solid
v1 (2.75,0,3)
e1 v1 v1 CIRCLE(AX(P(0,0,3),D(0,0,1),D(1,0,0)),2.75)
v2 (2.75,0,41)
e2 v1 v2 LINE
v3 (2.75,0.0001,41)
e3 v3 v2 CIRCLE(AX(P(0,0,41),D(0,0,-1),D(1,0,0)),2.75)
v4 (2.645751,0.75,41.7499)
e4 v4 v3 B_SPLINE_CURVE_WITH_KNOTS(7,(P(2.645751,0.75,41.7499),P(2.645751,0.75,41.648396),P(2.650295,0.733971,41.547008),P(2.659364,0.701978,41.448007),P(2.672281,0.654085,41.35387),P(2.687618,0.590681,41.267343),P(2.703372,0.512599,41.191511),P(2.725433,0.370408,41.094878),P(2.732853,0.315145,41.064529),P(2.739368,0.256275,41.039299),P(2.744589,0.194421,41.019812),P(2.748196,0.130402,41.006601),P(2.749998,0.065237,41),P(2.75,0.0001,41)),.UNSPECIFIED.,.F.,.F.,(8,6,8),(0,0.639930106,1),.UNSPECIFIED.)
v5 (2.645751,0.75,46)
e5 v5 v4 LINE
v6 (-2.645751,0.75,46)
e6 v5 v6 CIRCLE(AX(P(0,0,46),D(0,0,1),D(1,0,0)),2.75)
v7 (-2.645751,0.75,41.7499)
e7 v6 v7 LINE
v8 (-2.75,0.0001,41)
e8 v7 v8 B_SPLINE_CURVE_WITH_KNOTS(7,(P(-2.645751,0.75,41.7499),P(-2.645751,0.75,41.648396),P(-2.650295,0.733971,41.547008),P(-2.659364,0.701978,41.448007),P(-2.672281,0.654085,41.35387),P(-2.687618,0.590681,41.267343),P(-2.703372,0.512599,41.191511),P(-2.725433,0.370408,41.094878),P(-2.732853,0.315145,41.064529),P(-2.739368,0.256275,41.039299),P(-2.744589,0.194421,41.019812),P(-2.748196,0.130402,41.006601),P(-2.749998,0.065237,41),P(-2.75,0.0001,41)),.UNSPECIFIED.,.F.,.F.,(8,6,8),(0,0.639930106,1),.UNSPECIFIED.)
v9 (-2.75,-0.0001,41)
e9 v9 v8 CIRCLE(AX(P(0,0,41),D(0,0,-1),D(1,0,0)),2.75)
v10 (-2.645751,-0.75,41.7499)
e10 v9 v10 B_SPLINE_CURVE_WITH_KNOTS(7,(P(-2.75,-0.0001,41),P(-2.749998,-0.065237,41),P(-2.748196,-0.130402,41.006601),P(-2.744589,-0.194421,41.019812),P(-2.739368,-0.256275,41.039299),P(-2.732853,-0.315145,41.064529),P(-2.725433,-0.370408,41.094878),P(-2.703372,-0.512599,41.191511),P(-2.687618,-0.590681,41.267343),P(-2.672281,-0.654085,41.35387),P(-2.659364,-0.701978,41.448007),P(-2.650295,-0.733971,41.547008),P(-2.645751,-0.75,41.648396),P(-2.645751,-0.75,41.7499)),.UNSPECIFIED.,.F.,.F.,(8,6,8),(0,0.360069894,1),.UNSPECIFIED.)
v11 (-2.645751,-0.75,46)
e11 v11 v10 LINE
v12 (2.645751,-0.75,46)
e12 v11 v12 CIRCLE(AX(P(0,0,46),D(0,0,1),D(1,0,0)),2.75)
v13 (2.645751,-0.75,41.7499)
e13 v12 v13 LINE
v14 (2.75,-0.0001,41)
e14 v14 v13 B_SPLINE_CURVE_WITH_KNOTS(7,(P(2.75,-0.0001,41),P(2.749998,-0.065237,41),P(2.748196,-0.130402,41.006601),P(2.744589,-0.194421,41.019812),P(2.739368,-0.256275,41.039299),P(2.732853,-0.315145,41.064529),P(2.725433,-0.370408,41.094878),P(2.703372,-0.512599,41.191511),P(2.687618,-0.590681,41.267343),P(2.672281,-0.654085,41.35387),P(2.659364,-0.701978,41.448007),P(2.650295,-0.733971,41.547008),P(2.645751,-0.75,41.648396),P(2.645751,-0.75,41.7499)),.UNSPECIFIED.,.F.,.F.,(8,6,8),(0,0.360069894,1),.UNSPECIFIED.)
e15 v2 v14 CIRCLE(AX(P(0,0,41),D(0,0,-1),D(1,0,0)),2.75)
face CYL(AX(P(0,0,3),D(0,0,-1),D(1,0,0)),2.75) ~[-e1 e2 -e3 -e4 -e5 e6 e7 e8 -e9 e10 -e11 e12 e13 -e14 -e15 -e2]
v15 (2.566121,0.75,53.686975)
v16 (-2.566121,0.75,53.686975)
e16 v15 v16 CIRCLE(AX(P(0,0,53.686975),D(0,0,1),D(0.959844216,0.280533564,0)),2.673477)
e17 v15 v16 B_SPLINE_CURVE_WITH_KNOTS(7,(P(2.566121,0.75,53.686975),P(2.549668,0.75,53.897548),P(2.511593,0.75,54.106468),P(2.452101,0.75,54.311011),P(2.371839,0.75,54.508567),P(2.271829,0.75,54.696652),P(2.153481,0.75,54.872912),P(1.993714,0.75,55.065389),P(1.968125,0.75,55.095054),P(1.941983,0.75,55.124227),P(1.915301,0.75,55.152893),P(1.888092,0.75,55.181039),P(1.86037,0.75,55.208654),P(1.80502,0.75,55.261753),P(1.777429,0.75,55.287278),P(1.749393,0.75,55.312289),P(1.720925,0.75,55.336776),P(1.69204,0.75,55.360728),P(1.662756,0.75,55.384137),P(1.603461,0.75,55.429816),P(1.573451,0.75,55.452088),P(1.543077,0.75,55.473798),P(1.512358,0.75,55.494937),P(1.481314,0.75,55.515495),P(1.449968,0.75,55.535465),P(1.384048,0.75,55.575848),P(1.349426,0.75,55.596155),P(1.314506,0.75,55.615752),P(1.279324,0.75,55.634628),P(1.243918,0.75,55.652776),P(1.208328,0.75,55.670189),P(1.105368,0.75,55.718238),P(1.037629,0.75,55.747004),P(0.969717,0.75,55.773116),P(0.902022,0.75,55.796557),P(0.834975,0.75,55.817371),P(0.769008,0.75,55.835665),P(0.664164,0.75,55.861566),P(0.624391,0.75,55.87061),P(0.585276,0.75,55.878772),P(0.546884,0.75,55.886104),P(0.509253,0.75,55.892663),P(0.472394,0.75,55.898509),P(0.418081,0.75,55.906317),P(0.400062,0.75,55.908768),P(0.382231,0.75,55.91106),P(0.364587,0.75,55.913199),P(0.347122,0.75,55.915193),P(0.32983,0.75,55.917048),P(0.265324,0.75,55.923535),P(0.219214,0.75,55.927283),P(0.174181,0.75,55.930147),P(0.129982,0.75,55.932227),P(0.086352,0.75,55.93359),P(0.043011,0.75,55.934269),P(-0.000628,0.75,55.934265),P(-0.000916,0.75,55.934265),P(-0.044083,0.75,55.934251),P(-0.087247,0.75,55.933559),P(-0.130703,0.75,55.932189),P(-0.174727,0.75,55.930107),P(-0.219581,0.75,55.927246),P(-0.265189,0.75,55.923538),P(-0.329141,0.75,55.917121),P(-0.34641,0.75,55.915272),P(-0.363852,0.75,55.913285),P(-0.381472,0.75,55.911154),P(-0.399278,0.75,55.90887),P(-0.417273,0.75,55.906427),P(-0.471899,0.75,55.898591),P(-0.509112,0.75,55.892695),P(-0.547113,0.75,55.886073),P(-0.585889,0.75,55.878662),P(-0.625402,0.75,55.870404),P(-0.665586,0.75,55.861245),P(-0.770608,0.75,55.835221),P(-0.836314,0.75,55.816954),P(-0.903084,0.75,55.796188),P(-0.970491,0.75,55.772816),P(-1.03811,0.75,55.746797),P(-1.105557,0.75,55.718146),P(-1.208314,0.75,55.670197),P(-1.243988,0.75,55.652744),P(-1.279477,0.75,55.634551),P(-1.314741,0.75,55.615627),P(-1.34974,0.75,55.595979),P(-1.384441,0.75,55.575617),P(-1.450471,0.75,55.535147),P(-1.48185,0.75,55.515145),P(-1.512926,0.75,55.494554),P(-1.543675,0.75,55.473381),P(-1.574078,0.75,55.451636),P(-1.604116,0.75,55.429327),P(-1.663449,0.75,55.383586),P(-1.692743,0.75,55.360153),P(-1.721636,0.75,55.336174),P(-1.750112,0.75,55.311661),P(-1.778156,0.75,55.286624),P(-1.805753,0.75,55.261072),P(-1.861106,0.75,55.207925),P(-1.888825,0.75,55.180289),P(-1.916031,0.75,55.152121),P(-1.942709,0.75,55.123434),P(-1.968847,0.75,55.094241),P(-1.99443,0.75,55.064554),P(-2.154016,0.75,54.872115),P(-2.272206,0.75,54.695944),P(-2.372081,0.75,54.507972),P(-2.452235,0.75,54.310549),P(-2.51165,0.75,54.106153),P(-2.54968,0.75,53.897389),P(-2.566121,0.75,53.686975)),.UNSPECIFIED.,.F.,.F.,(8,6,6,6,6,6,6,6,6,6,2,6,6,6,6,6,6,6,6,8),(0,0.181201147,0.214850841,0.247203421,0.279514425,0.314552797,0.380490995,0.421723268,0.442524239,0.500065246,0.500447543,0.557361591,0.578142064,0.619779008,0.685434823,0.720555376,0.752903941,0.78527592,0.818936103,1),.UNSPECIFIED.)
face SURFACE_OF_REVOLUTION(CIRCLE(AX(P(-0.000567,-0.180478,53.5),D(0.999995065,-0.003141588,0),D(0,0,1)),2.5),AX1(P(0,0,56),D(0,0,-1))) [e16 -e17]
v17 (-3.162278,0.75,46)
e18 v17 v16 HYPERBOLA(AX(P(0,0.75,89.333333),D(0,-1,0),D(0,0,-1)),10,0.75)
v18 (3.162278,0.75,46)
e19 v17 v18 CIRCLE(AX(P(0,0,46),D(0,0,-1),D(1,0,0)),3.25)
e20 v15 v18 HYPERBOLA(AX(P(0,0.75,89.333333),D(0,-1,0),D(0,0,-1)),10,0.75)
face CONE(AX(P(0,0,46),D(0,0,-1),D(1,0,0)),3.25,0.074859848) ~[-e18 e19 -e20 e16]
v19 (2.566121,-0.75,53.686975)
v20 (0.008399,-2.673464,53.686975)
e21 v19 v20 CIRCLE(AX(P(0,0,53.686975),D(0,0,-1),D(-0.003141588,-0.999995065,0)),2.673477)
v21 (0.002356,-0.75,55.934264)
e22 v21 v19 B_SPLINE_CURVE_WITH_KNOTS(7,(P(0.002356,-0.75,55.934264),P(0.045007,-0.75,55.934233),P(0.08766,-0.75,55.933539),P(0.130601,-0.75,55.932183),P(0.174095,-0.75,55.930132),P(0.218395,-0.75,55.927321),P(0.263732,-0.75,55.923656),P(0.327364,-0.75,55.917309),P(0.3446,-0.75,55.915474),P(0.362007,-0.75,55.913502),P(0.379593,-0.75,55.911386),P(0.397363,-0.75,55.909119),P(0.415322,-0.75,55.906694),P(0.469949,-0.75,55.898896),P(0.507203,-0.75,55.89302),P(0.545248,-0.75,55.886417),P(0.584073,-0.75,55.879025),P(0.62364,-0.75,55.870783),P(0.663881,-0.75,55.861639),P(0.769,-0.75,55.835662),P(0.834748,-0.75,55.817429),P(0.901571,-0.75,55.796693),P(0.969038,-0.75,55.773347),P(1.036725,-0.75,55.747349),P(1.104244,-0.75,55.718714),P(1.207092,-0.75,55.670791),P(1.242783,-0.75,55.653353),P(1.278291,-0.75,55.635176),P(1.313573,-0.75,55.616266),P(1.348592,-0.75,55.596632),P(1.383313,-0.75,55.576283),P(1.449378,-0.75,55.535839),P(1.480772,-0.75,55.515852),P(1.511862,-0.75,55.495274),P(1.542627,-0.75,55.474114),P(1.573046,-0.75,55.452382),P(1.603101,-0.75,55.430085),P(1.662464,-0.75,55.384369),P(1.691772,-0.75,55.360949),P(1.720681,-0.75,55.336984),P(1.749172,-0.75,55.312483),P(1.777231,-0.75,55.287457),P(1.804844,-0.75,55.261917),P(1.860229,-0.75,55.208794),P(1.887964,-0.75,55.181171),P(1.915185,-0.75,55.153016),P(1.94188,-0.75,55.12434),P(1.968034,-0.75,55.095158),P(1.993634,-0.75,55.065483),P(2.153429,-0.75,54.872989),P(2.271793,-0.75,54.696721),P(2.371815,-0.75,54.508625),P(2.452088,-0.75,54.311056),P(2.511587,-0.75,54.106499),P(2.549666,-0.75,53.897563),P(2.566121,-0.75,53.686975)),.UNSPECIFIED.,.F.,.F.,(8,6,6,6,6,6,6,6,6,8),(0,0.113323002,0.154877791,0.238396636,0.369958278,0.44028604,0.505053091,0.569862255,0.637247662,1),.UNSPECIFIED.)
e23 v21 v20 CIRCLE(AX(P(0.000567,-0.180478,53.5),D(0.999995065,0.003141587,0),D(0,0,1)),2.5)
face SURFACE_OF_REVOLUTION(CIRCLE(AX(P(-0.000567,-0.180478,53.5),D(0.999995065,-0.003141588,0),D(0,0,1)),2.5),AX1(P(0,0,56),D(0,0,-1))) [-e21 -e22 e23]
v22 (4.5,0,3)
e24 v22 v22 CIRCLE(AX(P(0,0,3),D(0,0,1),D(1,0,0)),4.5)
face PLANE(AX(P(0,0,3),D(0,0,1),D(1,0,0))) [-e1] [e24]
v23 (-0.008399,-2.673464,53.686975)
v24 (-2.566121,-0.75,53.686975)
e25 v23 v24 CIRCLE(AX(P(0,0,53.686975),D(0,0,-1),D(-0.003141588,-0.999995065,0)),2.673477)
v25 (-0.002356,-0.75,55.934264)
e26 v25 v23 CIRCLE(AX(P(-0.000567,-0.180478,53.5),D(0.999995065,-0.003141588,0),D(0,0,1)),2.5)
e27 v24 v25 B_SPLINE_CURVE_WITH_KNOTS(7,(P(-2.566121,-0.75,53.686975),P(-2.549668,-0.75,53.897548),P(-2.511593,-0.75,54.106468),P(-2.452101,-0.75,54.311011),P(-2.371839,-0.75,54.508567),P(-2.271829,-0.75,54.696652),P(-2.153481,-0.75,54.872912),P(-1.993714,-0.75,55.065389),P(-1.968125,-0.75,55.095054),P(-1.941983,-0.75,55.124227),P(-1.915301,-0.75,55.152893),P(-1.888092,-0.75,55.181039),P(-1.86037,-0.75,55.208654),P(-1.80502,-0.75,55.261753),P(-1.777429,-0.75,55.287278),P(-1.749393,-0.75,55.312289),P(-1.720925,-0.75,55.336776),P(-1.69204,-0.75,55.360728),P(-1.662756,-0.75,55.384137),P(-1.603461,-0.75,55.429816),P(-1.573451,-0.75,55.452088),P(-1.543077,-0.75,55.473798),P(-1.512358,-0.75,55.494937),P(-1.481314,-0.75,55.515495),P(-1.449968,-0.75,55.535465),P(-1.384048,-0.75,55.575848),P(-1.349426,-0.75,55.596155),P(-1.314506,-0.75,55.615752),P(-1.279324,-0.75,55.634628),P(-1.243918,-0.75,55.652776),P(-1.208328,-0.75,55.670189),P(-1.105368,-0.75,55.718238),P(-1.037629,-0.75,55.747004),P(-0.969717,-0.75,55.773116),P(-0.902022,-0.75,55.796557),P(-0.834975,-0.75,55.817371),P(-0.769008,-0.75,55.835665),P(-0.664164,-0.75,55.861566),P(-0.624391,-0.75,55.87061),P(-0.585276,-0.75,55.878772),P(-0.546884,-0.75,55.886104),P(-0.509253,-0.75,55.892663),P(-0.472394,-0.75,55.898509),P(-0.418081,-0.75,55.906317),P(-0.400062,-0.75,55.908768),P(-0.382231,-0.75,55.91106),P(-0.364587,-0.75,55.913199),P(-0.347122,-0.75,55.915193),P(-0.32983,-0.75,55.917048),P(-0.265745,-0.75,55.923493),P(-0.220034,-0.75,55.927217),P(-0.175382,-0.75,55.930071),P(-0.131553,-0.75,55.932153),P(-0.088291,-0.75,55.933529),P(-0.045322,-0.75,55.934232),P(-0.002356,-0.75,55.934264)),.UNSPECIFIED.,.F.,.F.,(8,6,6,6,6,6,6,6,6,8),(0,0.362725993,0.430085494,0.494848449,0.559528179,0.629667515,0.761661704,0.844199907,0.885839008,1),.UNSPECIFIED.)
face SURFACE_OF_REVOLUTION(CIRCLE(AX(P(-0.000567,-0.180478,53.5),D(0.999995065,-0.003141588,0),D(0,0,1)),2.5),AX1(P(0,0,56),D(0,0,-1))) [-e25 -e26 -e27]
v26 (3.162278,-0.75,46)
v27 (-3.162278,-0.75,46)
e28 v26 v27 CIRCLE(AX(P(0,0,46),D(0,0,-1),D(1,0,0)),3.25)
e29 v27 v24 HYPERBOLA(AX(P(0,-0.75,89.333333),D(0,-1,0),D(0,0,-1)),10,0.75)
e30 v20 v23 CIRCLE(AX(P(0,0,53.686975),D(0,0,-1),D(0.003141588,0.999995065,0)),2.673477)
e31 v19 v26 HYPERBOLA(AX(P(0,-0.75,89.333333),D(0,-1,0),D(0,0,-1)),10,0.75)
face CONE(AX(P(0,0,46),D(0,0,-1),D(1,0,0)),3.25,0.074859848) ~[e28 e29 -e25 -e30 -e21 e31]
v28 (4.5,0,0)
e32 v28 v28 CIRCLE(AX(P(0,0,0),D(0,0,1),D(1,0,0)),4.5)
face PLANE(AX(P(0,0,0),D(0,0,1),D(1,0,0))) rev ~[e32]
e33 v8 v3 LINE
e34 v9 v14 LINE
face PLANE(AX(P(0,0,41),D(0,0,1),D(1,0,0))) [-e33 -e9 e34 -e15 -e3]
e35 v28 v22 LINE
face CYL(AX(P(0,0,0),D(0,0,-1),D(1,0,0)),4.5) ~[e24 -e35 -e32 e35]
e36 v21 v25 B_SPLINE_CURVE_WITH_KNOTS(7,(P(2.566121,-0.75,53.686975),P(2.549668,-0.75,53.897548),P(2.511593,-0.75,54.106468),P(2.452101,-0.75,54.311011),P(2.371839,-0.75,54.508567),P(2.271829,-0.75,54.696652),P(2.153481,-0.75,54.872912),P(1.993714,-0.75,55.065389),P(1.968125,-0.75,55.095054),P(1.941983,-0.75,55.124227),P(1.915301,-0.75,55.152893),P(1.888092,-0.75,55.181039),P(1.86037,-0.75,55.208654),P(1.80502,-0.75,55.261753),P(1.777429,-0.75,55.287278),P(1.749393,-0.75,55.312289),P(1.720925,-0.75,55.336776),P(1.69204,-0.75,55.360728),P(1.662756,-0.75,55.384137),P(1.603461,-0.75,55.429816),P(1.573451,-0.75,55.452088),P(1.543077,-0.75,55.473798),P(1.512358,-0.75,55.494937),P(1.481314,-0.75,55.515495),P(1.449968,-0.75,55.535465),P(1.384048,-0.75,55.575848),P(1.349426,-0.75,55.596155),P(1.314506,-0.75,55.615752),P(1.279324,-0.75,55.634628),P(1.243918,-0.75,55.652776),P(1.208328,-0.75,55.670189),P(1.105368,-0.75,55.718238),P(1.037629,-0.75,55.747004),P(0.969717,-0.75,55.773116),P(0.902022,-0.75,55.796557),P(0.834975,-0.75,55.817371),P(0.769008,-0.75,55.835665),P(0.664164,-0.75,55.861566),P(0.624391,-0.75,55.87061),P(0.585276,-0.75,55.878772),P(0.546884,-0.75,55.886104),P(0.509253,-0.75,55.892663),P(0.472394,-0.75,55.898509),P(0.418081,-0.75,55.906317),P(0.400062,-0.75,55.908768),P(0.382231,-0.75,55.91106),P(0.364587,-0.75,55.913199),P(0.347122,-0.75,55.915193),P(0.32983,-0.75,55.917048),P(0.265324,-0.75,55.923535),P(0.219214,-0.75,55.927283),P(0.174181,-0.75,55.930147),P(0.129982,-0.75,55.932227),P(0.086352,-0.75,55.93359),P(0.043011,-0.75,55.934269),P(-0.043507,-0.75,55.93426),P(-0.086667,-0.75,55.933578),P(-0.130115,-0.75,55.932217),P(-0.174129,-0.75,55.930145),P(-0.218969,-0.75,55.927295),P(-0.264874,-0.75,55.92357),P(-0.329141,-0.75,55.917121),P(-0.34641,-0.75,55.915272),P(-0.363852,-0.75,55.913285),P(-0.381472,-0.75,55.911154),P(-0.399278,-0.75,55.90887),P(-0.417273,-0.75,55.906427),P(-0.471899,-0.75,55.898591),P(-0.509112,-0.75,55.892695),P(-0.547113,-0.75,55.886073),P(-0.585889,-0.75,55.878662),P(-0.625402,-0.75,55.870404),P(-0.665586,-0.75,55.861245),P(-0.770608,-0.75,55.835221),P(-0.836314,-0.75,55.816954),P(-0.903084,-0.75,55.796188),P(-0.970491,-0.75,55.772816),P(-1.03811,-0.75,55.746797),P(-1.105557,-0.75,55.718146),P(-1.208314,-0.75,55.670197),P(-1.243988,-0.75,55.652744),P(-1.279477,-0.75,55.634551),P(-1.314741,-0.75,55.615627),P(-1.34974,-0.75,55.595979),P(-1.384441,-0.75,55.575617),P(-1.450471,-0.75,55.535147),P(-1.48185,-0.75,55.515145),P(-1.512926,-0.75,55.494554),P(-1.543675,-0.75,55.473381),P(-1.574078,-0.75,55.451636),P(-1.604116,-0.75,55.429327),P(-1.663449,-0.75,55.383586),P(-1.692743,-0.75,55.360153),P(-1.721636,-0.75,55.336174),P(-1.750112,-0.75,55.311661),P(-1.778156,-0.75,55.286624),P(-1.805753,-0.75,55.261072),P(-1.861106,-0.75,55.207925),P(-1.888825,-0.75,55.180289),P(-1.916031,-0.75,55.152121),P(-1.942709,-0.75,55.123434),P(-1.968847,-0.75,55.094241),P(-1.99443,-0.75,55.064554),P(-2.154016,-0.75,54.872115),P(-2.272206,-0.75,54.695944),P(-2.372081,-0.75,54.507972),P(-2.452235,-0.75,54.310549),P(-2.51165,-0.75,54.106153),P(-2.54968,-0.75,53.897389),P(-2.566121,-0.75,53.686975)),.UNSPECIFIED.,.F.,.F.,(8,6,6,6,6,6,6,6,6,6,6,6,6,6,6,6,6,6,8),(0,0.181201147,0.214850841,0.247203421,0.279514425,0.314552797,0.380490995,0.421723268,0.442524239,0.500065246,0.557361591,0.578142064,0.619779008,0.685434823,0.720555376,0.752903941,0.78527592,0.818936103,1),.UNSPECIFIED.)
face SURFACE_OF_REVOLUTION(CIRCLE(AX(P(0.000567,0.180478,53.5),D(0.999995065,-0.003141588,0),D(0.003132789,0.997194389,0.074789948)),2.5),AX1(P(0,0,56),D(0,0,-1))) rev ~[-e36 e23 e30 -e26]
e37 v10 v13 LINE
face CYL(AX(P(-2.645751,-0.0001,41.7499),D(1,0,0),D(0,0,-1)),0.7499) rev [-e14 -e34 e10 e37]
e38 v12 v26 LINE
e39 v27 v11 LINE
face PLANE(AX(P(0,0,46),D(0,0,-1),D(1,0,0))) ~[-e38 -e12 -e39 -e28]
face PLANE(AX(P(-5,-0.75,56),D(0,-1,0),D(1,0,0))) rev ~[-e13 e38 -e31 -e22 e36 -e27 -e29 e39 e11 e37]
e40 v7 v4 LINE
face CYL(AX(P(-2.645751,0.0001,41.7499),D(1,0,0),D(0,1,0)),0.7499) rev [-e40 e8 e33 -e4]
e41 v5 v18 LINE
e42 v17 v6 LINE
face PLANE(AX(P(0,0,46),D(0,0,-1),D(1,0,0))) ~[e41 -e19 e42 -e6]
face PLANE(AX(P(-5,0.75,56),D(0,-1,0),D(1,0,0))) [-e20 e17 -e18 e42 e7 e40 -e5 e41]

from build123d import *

# Parameters (mm, degrees)
F0_R        = 4.5
F1_DEPTH    = 3
F2_R        = 2.75
F3_DEPTH    = 43
F6_W        = 10
F6_H        = 1.5
F7_DEPTH    = 15
F8_T2_ANGLE = 359.64
F8_T4_ANGLE = 359.64
F9_R        = 0.7499


# Not quite as in the source:
# - a fillet or chamfer that OpenCascade refuses, or shapes differently, is made with other operations: its cross-section is extruded or revolved along the edge and cut away or added
# - a fillet or chamfer is up to 0.001 mm smaller than in the source, because OpenCascade refuses the exact size


with BuildPart() as f1:
    # F0 (on Top) → F1 (new body)
    with BuildSketch(Plane.XY):
        Circle(F0_R)
    extrude(amount=F1_DEPTH)

    # F2 (on face) → F3 (join)
    with BuildSketch(Plane.XY.offset(3)):
        Circle(F2_R)
    extrude(amount=F3_DEPTH)

    # F4 (on Front) → F5 (revolve)
    with BuildSketch(Plane.XZ):
        Polygon((0, 56), (0, 46), (3.25, 46), (2.5, 56), align=None)
    revolve(axis=Axis((0, 0, 51), (0, 0, -1)))

    # F6 (on face) → F7 (cut)
    with BuildSketch(Plane.XY.offset(56)):
        Rectangle(F6_W, F6_H)
    extrude(amount=-F7_DEPTH, mode=Mode.SUBTRACT)

    # F8: fillet of radius 2.5 on 2 edges, made by hand

    # F8_s1 → F8_t2 (revolve, cut)
    with BuildSketch(Plane(origin=(0, 0, 0), x_dir=(0, 0, 1), z_dir=(0.9999950652, -0.0031415875, 0))):
        with BuildLine():
            ThreePointArc((56, 0.18047861), (55.3326807109, 1.880855454), (53.6869748706, 2.6734768847))
            Line((53.6869748706, 2.6734768847), (56, 2.5))
            Line((56, 2.5), (56, 0.18047861))
        make_face()
    revolve(axis=Axis((0, 0, 56), (0, 0, -1)), revolution_arc=F8_T2_ANGLE, mode=Mode.SUBTRACT)

    # F8_s3 → F8_t4 (revolve, cut)
    with BuildSketch(Plane(origin=(0, 0, 0), x_dir=(0, 0, 1), z_dir=(-0.9999950652, 0.0031415875, 0))):
        with BuildLine():
            ThreePointArc((53.6869748706, 2.6734768847), (55.3326807109, 1.880855454), (56, 0.18047861))
            Line((56, 0.18047861), (56, 2.5))
            Line((56, 2.5), (53.6869748706, 2.6734768847))
        make_face()
    revolve(axis=Axis((0, 0, 56), (0, 0, -1)), revolution_arc=F8_T4_ANGLE, mode=Mode.SUBTRACT)

    # F9 (radius 0.75 in the source; OpenCascade refuses exactly that, so slightly less here)
    f9_edges = [f1.edges().sort_by_distance(p)[0] for p in [
        (0, 0.75, 41),
        (0, -0.75, 41),
    ]]
    fillet(f9_edges, radius=F9_R)


solid = f1.part
